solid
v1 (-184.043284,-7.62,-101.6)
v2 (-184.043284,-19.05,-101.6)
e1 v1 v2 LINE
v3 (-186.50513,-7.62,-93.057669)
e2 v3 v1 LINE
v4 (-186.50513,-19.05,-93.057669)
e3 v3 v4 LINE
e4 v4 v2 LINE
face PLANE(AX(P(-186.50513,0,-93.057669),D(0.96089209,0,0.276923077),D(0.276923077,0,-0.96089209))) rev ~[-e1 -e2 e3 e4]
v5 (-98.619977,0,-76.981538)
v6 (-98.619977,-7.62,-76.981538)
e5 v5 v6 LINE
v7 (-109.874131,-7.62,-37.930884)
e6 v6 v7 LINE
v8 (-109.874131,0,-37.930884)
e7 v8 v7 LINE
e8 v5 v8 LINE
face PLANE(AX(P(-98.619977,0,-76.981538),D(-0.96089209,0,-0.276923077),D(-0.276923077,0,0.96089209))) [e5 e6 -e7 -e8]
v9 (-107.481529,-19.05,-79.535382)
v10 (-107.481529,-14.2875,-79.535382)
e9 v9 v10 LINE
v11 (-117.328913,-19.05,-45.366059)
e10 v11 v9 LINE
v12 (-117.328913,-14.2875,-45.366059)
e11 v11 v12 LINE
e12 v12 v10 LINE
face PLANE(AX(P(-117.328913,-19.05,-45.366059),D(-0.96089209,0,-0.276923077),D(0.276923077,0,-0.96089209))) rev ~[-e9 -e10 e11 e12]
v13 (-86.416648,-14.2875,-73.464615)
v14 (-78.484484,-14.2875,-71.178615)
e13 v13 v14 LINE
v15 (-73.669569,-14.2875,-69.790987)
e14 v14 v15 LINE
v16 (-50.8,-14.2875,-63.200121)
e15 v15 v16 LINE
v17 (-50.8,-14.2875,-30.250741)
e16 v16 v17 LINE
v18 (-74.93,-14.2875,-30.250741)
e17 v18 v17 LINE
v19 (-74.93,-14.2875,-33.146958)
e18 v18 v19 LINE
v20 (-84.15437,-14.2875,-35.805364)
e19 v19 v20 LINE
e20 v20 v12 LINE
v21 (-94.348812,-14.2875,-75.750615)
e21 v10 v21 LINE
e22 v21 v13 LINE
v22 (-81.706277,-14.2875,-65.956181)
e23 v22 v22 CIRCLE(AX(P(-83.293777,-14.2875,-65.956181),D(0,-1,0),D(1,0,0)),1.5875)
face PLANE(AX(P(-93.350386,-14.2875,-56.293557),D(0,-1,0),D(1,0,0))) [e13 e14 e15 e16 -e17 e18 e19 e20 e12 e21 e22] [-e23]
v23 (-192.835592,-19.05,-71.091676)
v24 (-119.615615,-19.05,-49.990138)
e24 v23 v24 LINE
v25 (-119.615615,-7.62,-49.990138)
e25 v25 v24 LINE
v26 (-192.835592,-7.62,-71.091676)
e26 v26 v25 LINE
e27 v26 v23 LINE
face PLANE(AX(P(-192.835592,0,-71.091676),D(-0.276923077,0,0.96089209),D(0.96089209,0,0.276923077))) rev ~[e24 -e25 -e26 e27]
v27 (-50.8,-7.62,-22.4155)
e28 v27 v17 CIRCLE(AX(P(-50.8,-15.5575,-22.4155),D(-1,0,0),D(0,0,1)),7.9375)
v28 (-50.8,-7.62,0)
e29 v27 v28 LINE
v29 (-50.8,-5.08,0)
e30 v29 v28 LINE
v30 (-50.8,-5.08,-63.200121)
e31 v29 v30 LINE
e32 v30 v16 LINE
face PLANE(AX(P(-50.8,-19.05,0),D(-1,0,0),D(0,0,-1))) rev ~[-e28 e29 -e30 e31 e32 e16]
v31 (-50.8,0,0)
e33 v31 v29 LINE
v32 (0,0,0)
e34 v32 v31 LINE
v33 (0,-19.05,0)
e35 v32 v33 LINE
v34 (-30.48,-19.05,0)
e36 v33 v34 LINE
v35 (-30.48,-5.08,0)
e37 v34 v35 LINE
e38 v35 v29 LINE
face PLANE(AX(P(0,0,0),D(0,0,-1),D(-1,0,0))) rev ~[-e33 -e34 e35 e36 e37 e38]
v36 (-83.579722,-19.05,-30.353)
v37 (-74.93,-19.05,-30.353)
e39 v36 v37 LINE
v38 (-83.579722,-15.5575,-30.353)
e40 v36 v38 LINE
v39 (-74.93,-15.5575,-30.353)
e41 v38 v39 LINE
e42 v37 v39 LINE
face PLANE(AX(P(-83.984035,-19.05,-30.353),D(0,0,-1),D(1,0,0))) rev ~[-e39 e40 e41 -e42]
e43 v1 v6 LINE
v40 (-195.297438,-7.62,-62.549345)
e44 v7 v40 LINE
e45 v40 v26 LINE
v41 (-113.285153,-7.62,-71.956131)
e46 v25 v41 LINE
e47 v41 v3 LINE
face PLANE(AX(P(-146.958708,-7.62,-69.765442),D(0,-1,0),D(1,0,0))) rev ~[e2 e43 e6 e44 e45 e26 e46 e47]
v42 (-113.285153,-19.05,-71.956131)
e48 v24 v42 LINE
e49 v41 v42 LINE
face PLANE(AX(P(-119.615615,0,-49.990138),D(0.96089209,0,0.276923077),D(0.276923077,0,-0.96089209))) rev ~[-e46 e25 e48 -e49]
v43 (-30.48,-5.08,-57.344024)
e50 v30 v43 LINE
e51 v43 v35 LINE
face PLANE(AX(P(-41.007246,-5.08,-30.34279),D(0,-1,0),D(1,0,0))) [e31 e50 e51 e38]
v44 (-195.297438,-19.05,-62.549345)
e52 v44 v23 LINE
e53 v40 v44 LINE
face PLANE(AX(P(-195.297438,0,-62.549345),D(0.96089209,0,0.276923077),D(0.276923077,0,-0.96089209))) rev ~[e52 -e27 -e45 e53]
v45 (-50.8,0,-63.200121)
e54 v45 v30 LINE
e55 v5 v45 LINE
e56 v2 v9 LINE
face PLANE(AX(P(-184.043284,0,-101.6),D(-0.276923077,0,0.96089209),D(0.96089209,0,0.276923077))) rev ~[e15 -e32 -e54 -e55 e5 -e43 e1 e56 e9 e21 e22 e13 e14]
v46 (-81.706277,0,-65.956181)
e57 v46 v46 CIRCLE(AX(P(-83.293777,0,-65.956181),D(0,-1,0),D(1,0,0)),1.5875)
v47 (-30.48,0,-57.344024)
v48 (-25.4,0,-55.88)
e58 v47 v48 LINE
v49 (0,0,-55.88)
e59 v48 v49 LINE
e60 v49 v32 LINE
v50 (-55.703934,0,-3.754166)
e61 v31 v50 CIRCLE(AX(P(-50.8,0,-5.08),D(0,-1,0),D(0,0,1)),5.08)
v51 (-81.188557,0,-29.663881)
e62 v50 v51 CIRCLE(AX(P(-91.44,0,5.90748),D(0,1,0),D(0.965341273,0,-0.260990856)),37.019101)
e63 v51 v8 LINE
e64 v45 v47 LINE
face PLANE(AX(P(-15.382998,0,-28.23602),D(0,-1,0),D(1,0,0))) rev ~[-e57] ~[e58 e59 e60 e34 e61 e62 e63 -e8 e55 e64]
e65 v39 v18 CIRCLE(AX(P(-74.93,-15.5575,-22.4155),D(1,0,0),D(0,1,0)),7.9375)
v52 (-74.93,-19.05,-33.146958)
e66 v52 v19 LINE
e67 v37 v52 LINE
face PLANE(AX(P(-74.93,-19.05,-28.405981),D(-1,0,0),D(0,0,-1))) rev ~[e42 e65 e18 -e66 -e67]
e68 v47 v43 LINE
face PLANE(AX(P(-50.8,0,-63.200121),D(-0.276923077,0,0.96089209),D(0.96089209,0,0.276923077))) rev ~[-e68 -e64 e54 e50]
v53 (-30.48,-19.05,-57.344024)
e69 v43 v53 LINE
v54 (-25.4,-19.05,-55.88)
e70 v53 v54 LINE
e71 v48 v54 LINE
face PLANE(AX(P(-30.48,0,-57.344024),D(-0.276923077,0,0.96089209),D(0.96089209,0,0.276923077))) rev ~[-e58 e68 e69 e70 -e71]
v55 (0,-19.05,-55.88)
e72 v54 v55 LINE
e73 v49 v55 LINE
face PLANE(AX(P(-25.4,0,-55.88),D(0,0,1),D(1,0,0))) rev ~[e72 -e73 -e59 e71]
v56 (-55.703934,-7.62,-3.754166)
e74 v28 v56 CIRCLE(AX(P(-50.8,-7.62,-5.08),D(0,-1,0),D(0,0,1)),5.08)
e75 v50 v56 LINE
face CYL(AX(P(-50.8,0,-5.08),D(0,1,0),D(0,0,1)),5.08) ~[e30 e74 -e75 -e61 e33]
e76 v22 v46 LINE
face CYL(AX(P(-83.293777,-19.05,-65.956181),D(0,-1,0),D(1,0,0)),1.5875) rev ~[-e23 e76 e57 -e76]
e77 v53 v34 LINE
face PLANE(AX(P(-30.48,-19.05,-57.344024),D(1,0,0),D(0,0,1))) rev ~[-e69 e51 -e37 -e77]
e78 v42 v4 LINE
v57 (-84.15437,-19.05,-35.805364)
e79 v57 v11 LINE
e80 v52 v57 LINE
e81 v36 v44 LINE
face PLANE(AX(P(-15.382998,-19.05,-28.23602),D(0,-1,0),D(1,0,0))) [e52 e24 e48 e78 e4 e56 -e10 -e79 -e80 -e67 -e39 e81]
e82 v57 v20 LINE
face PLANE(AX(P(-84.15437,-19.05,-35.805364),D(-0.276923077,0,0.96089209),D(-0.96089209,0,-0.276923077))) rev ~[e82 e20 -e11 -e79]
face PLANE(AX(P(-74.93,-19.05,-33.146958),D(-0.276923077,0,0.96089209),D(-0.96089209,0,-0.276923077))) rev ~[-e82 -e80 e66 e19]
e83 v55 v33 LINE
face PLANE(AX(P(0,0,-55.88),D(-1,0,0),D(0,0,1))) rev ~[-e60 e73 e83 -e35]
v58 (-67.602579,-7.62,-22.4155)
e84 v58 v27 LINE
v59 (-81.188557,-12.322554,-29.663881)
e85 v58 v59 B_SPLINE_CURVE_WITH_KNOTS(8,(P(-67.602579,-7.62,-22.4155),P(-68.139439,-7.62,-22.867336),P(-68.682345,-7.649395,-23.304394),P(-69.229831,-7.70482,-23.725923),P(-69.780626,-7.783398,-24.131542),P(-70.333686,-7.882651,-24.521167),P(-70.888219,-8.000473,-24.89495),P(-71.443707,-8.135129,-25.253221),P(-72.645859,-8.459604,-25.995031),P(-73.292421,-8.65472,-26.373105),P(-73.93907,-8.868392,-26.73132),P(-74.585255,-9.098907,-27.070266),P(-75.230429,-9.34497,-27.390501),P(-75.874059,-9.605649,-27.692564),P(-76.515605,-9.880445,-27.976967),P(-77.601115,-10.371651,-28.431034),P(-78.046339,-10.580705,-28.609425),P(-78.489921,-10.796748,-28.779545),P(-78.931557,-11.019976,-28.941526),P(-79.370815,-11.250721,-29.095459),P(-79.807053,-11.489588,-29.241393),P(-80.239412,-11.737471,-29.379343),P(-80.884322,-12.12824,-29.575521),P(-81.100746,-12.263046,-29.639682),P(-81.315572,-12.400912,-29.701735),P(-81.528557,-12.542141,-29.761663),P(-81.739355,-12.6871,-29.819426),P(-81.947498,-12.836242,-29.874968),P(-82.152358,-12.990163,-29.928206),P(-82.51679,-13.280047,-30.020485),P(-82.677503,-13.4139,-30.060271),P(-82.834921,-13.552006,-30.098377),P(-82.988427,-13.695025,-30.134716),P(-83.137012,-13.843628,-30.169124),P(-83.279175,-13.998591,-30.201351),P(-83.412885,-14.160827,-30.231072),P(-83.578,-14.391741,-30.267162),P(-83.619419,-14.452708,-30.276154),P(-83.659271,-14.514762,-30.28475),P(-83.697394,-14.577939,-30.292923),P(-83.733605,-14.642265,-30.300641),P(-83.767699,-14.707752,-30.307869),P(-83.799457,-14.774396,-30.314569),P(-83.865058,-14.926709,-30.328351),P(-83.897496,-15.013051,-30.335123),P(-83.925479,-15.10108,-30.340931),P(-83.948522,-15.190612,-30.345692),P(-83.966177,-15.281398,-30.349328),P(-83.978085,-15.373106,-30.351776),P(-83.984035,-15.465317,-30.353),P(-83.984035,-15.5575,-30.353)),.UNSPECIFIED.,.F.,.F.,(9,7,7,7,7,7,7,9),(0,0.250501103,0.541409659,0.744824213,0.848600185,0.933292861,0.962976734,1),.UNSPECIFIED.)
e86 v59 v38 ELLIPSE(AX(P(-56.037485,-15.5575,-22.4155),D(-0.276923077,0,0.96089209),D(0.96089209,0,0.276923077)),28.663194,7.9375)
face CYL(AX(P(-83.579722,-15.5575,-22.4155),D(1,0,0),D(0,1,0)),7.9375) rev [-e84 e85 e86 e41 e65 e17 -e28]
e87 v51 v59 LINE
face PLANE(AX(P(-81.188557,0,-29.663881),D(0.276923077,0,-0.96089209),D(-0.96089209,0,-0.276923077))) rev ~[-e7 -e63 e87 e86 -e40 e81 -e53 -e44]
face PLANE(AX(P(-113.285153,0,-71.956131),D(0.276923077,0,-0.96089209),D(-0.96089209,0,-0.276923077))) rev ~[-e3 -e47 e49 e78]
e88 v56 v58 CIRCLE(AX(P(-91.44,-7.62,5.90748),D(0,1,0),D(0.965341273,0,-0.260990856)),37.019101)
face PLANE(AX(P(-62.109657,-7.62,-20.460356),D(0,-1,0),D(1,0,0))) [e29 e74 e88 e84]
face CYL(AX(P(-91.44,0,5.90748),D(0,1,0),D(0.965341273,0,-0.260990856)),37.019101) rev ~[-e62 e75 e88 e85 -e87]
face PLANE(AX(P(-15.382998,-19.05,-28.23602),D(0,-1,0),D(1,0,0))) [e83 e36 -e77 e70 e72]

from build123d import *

# Parameters (mm, degrees)
F1_DEPTH  = 19.05
F3_DEPTH  = 13.97
F5_DEPTH  = 7.62
F7_DEPTH  = 11.43
F8_R      = 7.9375
F9_R      = 1.5875
F10_DEPTH = 4.7625
F11_DEPTH = 19.0510001


# Not quite as in the source:
# - a feature names something its author has since deleted; it is built from what else it names


with BuildPart() as f1:
    # F0 (on Front) → F1 (new body)
    with BuildSketch(Plane.XZ):
        Polygon((0, -55.88), (0, 0), (-30.48, 0), (-30.48, -57.344024155), (-25.4, -55.88), align=None)
        with BuildLine():
            Line((-50.8, -63.2001207751), (-50.8, 0))
            ThreePointArc((-50.8, 0), (-53.8879738976, -1.0462898954), (-55.7039336667, -3.7541664537))
            ThreePointArc((-55.7039336667, -3.7541664537), (-65.0479350522, -20.0515789601), (-81.1885565746, -29.6638811382))
            Line((-81.1885565746, -29.6638811382), (-195.2974379776, -62.5493454446))
            Line((-195.2974379776, -62.5493454446), (-192.8355918237, -71.0916761286))
            Line((-192.8355918237, -71.0916761286), (-119.6156145323, -49.990137667))
            Line((-119.6156145323, -49.990137667), (-113.2851529938, -71.9561308545))
            Line((-113.2851529938, -71.9561308545), (-186.5051302853, -93.057669316))
            Line((-186.5051302853, -93.057669316), (-184.0432841314, -101.6))
            Line((-184.0432841314, -101.6), (-50.8, -63.2001207751))
        make_face()
        Polygon((-30.48, -57.344024155), (-30.48, 0), (-50.8, 0), (-50.8, -63.2001207751), align=None)
    extrude(amount=F1_DEPTH)

    # F2 (on face) → F3 (cut)
    with BuildSketch(Plane.XZ.offset(19.05)):
        Polygon((-30.48, 0), (-50.8, 0), (-50.8, -63.2001207751), (-30.48, -57.344024155), align=None)
    extrude(amount=-F3_DEPTH, mode=Mode.SUBTRACT)

    # F4 (on face) → F5 (cut)
    with BuildSketch(Plane.XZ):
        Polygon((-109.8741311376, -37.9308839061), (-195.2974379776, -62.5493454446), (-184.0432841314, -101.6), (-98.6199772914, -76.9815384615), align=None)
    extrude(amount=F5_DEPTH, mode=Mode.SUBTRACT)

    # F6 (on face) → F7 (cut)
    with BuildSketch(Plane.XZ.offset(19.05)):
        with BuildLine():
            Line((-83.9840349336, -30.353), (-50.8, -30.353))
            Line((-50.8, -30.353), (-50.8, 0))
            ThreePointArc((-50.8, 0), (-53.8879738976, -1.0462898954), (-55.7039336667, -3.7541664537))
            ThreePointArc((-55.7039336667, -3.7541664537), (-66.0773822208, -21.0582659153), (-83.9840349336, -30.353))
        make_face()
    extrude(amount=-F7_DEPTH, mode=Mode.SUBTRACT)

    # F8
    f8_edges = [f1.edges().sort_by_distance(p)[0] for p in [
        (-67.189861, -7.62, -30.353),
    ]]
    fillet(f8_edges, radius=F8_R)

    # F9 (on face) → F10 (cut)
    with BuildSketch(Plane.XZ.offset(19.05)):
        with BuildLine():
            Line((-78.4844835363, -71.1786153846), (-73.6695687, -69.790987112))
            ThreePointArc((-73.6695687, -69.7909871121), (-78.2220260856, -57.0610953752), (-78.0424581585, -43.5428570566))
            ThreePointArc((-78.0424581585, -43.5428570566), (-76.567170767, -38.1173977165), (-74.3094881962, -32.9681306475))
            Line((-74.3094881962, -32.9681306475), (-74.93, -33.1469582596))
            Line((-74.93, -33.1469582596), (-84.154369829, -35.8053638195))
            Line((-84.154369829, -35.8053638195), (-117.3289133872, -45.3660593118))
            Line((-117.3289133872, -45.3660593118), (-107.4815287718, -79.5353820478))
            Line((-107.4815287718, -79.5353820478), (-94.3488119494, -75.7506153846))
            Line((-94.3488119494, -75.7506153846), (-96.9865042571, -66.5981182232))
            Line((-96.9865042571, -66.5981182232), (-81.122175844, -62.0261182232))
            Line((-81.122175844, -62.0261182232), (-78.4844835363, -71.1786153846))
        make_face()
        Polygon((-86.4166477429, -73.4646153846), (-78.4844835363, -71.1786153846), (-81.122175844, -62.0261182232), (-96.9865042571, -66.5981182232), (-94.3488119494, -75.7506153846), align=None)
        with Locations((-93.0564411007, -68.7697198411)):
            Circle(F9_R, mode=Mode.SUBTRACT)
        with Locations((-83.2937774619, -65.9561813796)):
            Circle(F9_R, mode=Mode.SUBTRACT)
        with Locations((-83.2937774619, -65.9561813796)):
            Circle(F9_R)
        with Locations((-93.0564411007, -68.7697198411)):
            Circle(F9_R)
        with BuildLine():
            ThreePointArc((-78.0424581585, -43.5428570566), (-78.2220260856, -57.0610953752), (-73.6695687, -69.7909871121))
            Line((-73.6695687, -69.790987112), (-50.8, -63.2001207751))
            Line((-50.8, -63.2001207751), (-50.8, -53.6799892795))
            Line((-50.8, -53.6799892795), (-74.2742938603, -49.1253072525))
            ThreePointArc((-74.2742938603, -49.1253072525), (-77.3145392982, -47.1144945318), (-78.0424581585, -43.5428570566))
        make_face()
        with BuildLine():
            ThreePointArc((-74.3094881962, -32.9681306475), (-76.567170767, -38.1173977165), (-78.0424581585, -43.5428570566))
            ThreePointArc((-78.0424581585, -43.5428570566), (-72.9114890511, -39.7093483015), (-68.6046509033, -44.45))
            ThreePointArc((-68.6046509033, -44.45), (-70.3372055311, -48.1243485533), (-74.2742938603, -49.1253072525))
            Line((-74.2742938603, -49.1253072525), (-50.8, -53.6799892795))
            Line((-50.8, -53.6799892795), (-50.8, -42.2880161767))
            ThreePointArc((-50.8, -42.2880161767), (-54.8534085622, -36.9235653105), (-56.279986835, -30.353))
            Line((-56.279986835, -30.353), (-65.2352774711, -30.353))
            Line((-65.2352774711, -30.353), (-74.3094881962, -32.9681306475))
        make_face()
        with BuildLine():
            ThreePointArc((-68.6046509033, -44.45), (-72.9114890511, -39.7093483015), (-78.0424581585, -43.5428570566))
            ThreePointArc((-78.0424581585, -43.5428570566), (-77.3145392982, -47.1144945318), (-74.2742938603, -49.1253072525))
            ThreePointArc((-74.2742938603, -49.1253072525), (-70.3372055311, -48.1243485533), (-68.6046509033, -44.45))
        make_face()
        with BuildLine():
            Line((-50.8, -30.353), (-56.279986835, -30.353))
            ThreePointArc((-56.279986835, -30.353), (-54.8534085622, -36.9235653105), (-50.8, -42.2880161767))
            Line((-50.8, -42.2880161767), (-50.8, -30.353))
        make_face()
        with BuildLine():
            Line((-50.8, -28.4059811383), (-56.1527436573, -28.4059811383))
            ThreePointArc((-56.1527436573, -28.4059811383), (-56.2467573472, -29.3775043596), (-56.279986835, -30.353))
            Line((-56.279986835, -30.353), (-50.8, -30.353))
            Line((-50.8, -30.353), (-50.8, -28.4059811383))
        make_face()
        with BuildLine():
            Line((-56.1527436573, -28.4059811383), (-71.4639828579, -28.4059811383))
            ThreePointArc((-71.4639828579, -28.4059811383), (-72.1413197609, -29.3692544852), (-72.7885643692, -30.353))
            Line((-72.7885643692, -30.353), (-65.2352774711, -30.353))
            Line((-65.2352774711, -30.353), (-56.279986835, -30.353))
            ThreePointArc((-56.279986835, -30.353), (-56.2467573472, -29.3775043596), (-56.1527436573, -28.4059811383))
        make_face()
        with BuildLine():
            ThreePointArc((-72.7885643692, -30.353), (-72.1413197609, -29.3692544852), (-71.4639828579, -28.4059811383))
            Line((-71.4639828579, -28.4059811383), (-74.93, -28.4059811383))
            Line((-74.93, -28.4059811383), (-74.93, -30.353))
            Line((-74.93, -30.353), (-72.7885643692, -30.353))
        make_face()
        with BuildLine():
            ThreePointArc((-72.7885643692, -30.353), (-73.5749926059, -31.6454636692), (-74.3094881962, -32.9681306475))
            Line((-74.3094881962, -32.9681306475), (-65.2352774711, -30.353))
            Line((-65.2352774711, -30.353), (-72.7885643692, -30.353))
        make_face()
        with BuildLine():
            Line((-74.93, -33.1469582596), (-74.3094881962, -32.9681306475))
            ThreePointArc((-74.3094881962, -32.9681306475), (-73.5749926059, -31.6454636692), (-72.7885643692, -30.353))
            Line((-72.7885643692, -30.353), (-74.93, -30.353))
            Line((-74.93, -30.353), (-74.93, -33.1469582596))
        make_face()
    extrude(amount=-F10_DEPTH, mode=Mode.SUBTRACT)

    # F9 (on face) → F11 (cut, through all)
    with BuildSketch(Plane.XZ.offset(19.05)):
        with Locations((-83.2937774619, -65.9561813796)):
            Circle(F9_R)
    extrude(amount=-F11_DEPTH, mode=Mode.SUBTRACT)


solid = f1.part
